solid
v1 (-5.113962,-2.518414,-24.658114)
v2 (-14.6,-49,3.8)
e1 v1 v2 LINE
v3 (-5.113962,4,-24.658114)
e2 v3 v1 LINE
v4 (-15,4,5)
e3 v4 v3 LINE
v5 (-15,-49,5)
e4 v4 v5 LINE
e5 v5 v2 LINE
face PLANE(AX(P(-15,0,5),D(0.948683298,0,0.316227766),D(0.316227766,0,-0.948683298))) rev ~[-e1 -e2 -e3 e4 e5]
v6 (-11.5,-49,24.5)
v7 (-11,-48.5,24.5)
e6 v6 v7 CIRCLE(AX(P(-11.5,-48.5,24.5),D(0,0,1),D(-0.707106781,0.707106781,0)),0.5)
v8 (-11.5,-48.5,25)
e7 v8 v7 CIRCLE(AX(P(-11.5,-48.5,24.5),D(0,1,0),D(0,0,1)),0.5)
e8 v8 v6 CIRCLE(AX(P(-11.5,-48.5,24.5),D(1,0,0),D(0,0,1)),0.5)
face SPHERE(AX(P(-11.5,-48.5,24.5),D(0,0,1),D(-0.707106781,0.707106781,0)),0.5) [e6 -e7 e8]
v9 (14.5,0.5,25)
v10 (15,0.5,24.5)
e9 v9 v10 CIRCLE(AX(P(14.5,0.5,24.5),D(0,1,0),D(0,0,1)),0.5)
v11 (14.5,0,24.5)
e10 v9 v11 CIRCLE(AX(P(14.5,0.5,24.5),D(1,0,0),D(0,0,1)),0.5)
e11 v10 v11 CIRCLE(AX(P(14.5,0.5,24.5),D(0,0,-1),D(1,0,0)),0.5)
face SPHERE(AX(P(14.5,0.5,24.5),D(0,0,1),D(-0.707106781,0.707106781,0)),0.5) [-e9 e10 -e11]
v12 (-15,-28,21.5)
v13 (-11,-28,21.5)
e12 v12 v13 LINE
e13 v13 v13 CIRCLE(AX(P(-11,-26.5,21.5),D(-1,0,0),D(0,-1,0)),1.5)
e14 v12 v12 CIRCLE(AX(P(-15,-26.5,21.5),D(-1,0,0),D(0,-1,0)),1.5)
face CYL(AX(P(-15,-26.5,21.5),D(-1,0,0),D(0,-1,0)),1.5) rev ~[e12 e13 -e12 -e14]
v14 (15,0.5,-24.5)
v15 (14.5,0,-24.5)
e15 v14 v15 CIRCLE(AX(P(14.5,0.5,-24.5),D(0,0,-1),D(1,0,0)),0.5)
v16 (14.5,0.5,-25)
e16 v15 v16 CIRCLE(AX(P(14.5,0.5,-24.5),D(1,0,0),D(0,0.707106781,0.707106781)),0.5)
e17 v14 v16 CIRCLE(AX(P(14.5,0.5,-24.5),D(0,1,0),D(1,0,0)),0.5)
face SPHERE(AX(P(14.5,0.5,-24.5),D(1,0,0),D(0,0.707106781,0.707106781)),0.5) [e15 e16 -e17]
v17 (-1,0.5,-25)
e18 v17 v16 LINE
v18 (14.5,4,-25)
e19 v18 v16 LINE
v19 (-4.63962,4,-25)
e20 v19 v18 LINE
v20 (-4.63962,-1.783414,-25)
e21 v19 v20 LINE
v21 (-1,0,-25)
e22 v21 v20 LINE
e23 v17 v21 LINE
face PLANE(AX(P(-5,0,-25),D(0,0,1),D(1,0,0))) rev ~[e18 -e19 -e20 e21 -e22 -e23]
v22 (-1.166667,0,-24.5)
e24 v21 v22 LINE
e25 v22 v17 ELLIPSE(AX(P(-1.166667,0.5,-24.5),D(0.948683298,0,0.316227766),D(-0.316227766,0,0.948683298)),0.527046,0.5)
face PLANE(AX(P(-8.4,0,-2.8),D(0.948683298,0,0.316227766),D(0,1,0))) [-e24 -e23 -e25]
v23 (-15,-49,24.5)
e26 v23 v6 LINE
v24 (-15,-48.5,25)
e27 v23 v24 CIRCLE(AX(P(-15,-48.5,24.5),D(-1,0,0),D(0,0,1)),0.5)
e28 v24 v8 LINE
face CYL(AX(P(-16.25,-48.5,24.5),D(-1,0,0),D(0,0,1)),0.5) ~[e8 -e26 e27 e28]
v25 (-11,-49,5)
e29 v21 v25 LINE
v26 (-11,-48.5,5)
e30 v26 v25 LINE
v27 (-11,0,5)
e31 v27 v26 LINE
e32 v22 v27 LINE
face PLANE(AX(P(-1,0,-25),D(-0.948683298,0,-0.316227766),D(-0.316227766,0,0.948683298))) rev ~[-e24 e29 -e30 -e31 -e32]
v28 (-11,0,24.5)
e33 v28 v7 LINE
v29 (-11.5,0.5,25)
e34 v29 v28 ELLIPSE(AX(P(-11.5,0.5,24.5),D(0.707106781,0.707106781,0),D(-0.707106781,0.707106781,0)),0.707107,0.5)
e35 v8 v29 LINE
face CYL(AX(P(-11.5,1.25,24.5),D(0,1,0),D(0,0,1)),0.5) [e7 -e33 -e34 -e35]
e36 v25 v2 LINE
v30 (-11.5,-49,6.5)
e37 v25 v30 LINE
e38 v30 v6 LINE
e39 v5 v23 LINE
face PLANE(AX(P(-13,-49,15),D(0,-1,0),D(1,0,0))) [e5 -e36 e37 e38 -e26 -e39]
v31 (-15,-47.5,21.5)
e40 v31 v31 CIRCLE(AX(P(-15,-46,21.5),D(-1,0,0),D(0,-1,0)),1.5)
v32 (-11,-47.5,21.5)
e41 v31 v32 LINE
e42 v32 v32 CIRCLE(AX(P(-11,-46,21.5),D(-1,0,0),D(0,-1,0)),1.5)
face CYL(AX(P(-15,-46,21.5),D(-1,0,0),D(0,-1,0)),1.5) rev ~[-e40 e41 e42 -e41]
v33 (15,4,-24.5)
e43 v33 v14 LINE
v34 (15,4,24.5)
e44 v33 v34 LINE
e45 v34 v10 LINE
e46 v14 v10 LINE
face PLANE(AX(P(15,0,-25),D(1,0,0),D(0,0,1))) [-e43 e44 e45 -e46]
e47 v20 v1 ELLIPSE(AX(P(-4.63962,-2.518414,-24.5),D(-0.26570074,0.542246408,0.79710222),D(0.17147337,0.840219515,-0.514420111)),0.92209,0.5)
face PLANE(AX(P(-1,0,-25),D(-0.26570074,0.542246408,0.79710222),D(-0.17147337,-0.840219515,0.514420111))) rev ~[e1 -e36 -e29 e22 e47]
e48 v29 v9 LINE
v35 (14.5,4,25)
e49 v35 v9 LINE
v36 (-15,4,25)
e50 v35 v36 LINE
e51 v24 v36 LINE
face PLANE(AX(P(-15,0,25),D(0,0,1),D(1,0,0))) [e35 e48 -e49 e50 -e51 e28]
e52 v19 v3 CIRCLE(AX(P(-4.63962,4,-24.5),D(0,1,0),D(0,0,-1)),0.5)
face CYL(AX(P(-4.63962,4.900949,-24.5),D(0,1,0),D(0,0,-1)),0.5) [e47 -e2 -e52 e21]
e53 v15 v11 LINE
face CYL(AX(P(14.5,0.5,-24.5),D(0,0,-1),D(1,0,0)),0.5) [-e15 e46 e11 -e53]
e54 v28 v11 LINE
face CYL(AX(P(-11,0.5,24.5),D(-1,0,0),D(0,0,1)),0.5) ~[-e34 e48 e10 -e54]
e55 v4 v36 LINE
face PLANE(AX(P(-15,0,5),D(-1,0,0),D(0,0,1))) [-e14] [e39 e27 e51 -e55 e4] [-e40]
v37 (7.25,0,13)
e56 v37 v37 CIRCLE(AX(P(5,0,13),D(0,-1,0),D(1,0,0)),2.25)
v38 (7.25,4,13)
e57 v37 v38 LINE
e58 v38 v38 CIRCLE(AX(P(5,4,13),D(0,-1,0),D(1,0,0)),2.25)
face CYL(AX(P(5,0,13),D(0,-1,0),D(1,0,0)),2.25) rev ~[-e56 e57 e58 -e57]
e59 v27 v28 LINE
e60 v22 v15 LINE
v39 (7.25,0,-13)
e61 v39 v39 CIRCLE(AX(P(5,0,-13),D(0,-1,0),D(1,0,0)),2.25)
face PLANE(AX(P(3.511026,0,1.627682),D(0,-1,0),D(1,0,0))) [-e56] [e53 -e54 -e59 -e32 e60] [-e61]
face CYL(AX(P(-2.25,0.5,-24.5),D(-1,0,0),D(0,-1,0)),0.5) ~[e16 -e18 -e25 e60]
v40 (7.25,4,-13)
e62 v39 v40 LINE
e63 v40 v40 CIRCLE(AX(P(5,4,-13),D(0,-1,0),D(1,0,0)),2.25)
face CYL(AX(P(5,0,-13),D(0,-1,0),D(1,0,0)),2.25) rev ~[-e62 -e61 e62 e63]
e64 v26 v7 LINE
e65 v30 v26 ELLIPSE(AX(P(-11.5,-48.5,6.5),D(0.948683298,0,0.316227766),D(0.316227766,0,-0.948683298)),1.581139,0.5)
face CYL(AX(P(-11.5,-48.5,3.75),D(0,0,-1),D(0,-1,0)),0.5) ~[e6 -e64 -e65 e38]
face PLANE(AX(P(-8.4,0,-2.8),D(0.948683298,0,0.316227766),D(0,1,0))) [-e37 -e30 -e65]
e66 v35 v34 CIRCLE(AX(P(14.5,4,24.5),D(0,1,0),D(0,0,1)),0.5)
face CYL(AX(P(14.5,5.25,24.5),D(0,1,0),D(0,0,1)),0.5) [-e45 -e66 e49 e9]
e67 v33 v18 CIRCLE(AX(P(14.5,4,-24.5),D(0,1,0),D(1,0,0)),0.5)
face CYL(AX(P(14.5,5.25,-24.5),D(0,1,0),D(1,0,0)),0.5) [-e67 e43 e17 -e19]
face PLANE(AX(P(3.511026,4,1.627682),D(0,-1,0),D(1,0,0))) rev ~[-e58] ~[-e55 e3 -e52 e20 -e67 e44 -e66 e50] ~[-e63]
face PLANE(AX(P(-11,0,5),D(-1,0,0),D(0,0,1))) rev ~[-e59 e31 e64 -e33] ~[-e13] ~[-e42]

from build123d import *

# Parameters (mm, degrees)
F0_R         = 2.25
F0_W         = 4
F0_H         = 20
F1_DEPTH     = 4
F2_W         = 4
F2_H         = 20
F3_DEPTH     = 49
F5_DEPTH     = 13.2825661727
F6_T1_DEPTH  = 4.75
F6_T3_DEPTH  = 48.5
F6_T5_DEPTH  = 25.5
F6_T7_DEPTH  = 49
F6_T9_DEPTH  = 4.75
F6_T11_DEPTH = 7.7618980501
F6_S15_W     = 0.51
F6_S15_H     = 0.51
F6_T16_DEPTH = 0.51
F6_S21_W     = 0.51
F6_S21_H     = 0.51
F6_T22_DEPTH = 0.51
F6_S27_W     = 0.51
F6_S27_H     = 0.51
F6_T28_DEPTH = 0.51
F6_T34_DEPTH = 16.75
F6_T39_DEPTH = 20.75
F6_T45_DEPTH = 49.75
F6_T49_DEPTH = 26.75
F7_R         = 1.5
F8_DEPTH     = 30.001


# Not quite as in the source:
# - a fillet or chamfer that OpenCascade refuses, or shapes differently, is made with other operations: its cross-section is extruded or revolved along the edge and cut away or added


with BuildPart() as f1:
    # F0 (on Front) → F1 (new body)
    with BuildSketch(Plane.XZ):
        Polygon((15, 25), (-11, 25), (-11, 5), (-1, -25), (15, -25), align=None)
        with Locations((5, -13)):
            Circle(F0_R, mode=Mode.SUBTRACT)
        with Locations((5, 13)):
            Circle(F0_R, mode=Mode.SUBTRACT)
        with Locations((-13, 15)):
            Rectangle(F0_W, F0_H)
        Polygon((-11, 5), (-15, 5), (-5, -25), (-1, -25), align=None)
    extrude(amount=-F1_DEPTH)

    # F2 (on face) → F3 (join)
    with BuildSketch(Plane.XZ):
        with Locations((-13, 15)):
            Rectangle(F2_W, F2_H)
        Polygon((-11, 5), (-15, 5), (-5, -25), (-1, -25), align=None)
    extrude(amount=F3_DEPTH)

    # F4 (on face) → F5 (cut, through all)
    with BuildSketch(Plane(origin=(-8.4, 0, -2.8), x_dir=(0, 1, 0), z_dir=(0.9486832981, 0, 0.316227766))):
        Polygon((0, -23.4008546852), (-49, 8.2219219164), (-49, -23.4008546852), align=None)
    extrude(amount=-F5_DEPTH, mode=Mode.SUBTRACT)

    # F6: fillet of radius 0.5 on 9 edges, made by hand

    # F6_s2 → F6_t1 (cut)
    with BuildSketch(Plane.YZ.offset(-16.25)):
        with BuildLine():
            ThreePointArc((-48.5, 25), (-48.8535533906, 24.8535533906), (-49, 24.5))
            Line((-49, 24.5), (-49, 25))
            Line((-49, 25), (-48.5, 25))
        make_face()
    extrude(amount=F6_T1_DEPTH, mode=Mode.SUBTRACT)

    # F6_s4 → F6_t3 (cut)
    with BuildSketch(Plane.XZ):
        with BuildLine():
            ThreePointArc((-11.5, 25), (-11.1464466094, 24.8535533906), (-11, 24.5))
            Line((-11, 24.5), (-11, 25))
            Line((-11, 25), (-11.5, 25))
        make_face()
    extrude(amount=F6_T3_DEPTH, mode=Mode.SUBTRACT)

    # F6_s6 → F6_t5 (cut)
    with BuildSketch(Plane.YZ.offset(-11)):
        with BuildLine():
            ThreePointArc((0.5, 25), (0.1464466094, 24.8535533906), (0, 24.5))
            Line((0, 24.5), (0, 25))
            Line((0, 25), (0.5, 25))
        make_face()
    extrude(amount=F6_T5_DEPTH, mode=Mode.SUBTRACT)

    # F6_s8 → F6_t7 (cut)
    with BuildSketch(Plane.XY.offset(-24.5)):
        with BuildLine():
            ThreePointArc((15, 0.5), (14.8535533906, 0.1464466094), (14.5, 0))
            Line((14.5, 0), (15, 0))
            Line((15, 0), (15, 0.5))
        make_face()
    extrude(amount=F6_T7_DEPTH, mode=Mode.SUBTRACT)

    # F6_s10 → F6_t9 (cut)
    with BuildSketch(Plane.XZ.offset(-5.25)):
        with BuildLine():
            ThreePointArc((14.5, 25), (14.8535533906, 24.8535533906), (15, 24.5))
            Line((15, 24.5), (15, 25))
            Line((15, 25), (14.5, 25))
        make_face()
        with BuildLine():
            ThreePointArc((15, -24.5), (14.8535533906, -24.8535533906), (14.5, -25))
            Line((14.5, -25), (15, -25))
            Line((15, -25), (15, -24.5))
        make_face()
    extrude(amount=F6_T9_DEPTH, mode=Mode.SUBTRACT)

    # F6_s12 → F6_t11 (cut)
    with BuildSketch(Plane.XZ.offset(-4.9009490251)):
        with BuildLine():
            ThreePointArc((-4.63962039, -25), (-4.9319755323, -24.9056210926), (-5.113962039, -24.658113883))
            Line((-5.113962039, -24.658113883), (-5, -25))
            Line((-5, -25), (-4.63962039, -25))
        make_face()
    extrude(amount=F6_T11_DEPTH, mode=Mode.SUBTRACT)


with BuildPart() as f6_tool14:
    # F6_s15 → F6_t16 (new body)
    with BuildSketch(Plane.XY.offset(24.5)):
        with Locations((-11.245, -48.755)):
            Rectangle(F6_S15_W, F6_S15_H)
    extrude(amount=F6_T16_DEPTH)

    # F6_s17 → F6_t18 (revolve, cut)
    with BuildSketch(Plane(origin=(-11.5, -48.5, 24.5), x_dir=(-0.7071067812, 0.7071067812, 0), z_dir=(0.7071067812, 0.7071067812, 0))):
        with BuildLine():
            ThreePointArc((0, -0.5), (0.5, 0), (0, 0.5))
            Line((0, 0.5), (0, -0.5))
        make_face()
    revolve(axis=Axis((-11.5, -48.5, 24.5), (0, 0, 1)), mode=Mode.SUBTRACT)


with BuildPart() as f1_1:
    add(f1.part)

    # F6_t13: cut F6_tool14
    add(f6_tool14.part, mode=Mode.SUBTRACT)


with BuildPart() as f6_tool20:
    # F6_s21 → F6_t22 (new body)
    with BuildSketch(Plane.XY.offset(24.5)):
        with Locations((14.755, 0.245)):
            Rectangle(F6_S21_W, F6_S21_H)
    extrude(amount=F6_T22_DEPTH)

    # F6_s23 → F6_t24 (revolve, cut)
    with BuildSketch(Plane(origin=(14.5, 0.5, 24.5), x_dir=(-0.7071067812, 0.7071067812, 0), z_dir=(0.7071067812, 0.7071067812, 0))):
        with BuildLine():
            ThreePointArc((0, -0.5), (0.5, 0), (0, 0.5))
            Line((0, 0.5), (0, -0.5))
        make_face()
    revolve(axis=Axis((14.5, 0.5, 24.5), (0, 0, 1)), mode=Mode.SUBTRACT)


with BuildPart() as f1_2:
    add(f1_1.part)

    # F6_t19: cut F6_tool20
    add(f6_tool20.part, mode=Mode.SUBTRACT)


with BuildPart() as f6_tool26:
    # F6_s27 → F6_t28 (new body)
    with BuildSketch(Plane.YZ.offset(14.5)):
        with Locations((0.245, -24.755)):
            Rectangle(F6_S27_W, F6_S27_H)
    extrude(amount=F6_T28_DEPTH)

    # F6_s29 → F6_t30 (revolve, cut)
    with BuildSketch(Plane(origin=(14.5, 0.5, -24.5), x_dir=(0, 0.7071067812, 0.7071067812), z_dir=(0, 0.7071067812, -0.7071067812))):
        with BuildLine():
            ThreePointArc((0, -0.5), (0.5, 0), (0, 0.5))
            Line((0, 0.5), (0, -0.5))
        make_face()
    revolve(axis=Axis((14.5, 0.5, -24.5), (1, 0, 0)), mode=Mode.SUBTRACT)


with BuildPart() as f1_3:
    add(f1_2.part)

    # F6_t25: cut F6_tool26
    add(f6_tool26.part, mode=Mode.SUBTRACT)


with BuildPart() as f6_tool32:
    # F6_s33 → F6_t34 (new body)
    with BuildSketch(Plane.YZ.offset(-2.25)):
        with BuildLine():
            ThreePointArc((0, -24.5), (0.1464466094, -24.8535533906), (0.5, -25))
            Line((0.5, -25), (0, -25))
            Line((0, -25), (0, -24.5))
        make_face()
    extrude(amount=F6_T34_DEPTH)

    split(bisect_by=Plane(origin=(-8.4, 0, -2.8), x_dir=(0, 1, 0), z_dir=(0.9486832981, 0, 0.316227766)), keep=Keep.TOP)


with BuildPart() as f1_4:
    add(f1_3.part)

    # F6_t31: cut F6_tool32
    add(f6_tool32.part, mode=Mode.SUBTRACT)


with BuildPart() as f6_tool37:
    # F6_s38 → F6_t39 (new body)
    with BuildSketch(Plane.XY.offset(3.75)):
        with BuildLine():
            ThreePointArc((-11.5, -49), (-11.1464466094, -48.8535533906), (-11, -48.5))
            Line((-11, -48.5), (-11, -49))
            Line((-11, -49), (-11.5, -49))
        make_face()
    extrude(amount=F6_T39_DEPTH)

    split(bisect_by=Plane(origin=(-8.4, 0, -2.8), x_dir=(0, 1, 0), z_dir=(0.9486832981, 0, 0.316227766)), keep=Keep.TOP)


with BuildPart() as f1_5:
    add(f1_4.part)

    # F6_t36: cut F6_tool37
    add(f6_tool37.part, mode=Mode.SUBTRACT)


with BuildPart() as f6_tool43:
    # F6_s44 → F6_t45 (new body)
    with BuildSketch(Plane.XZ.offset(-1.25)):
        with BuildLine():
            ThreePointArc((-11.5, 25), (-11.1464466094, 24.8535533906), (-11, 24.5))
            Line((-11, 24.5), (-11, 25))
            Line((-11, 25), (-11.5, 25))
        make_face()
    extrude(amount=F6_T45_DEPTH)

    split(bisect_by=Plane.XZ, keep=Keep.BOTTOM)


with BuildPart() as f6_tool47:
    # F6_s48 → F6_t49 (new body)
    with BuildSketch(Plane.YZ.offset(14.5)):
        with BuildLine():
            ThreePointArc((0.5, 25), (0.1464466094, 24.8535533906), (0, 24.5))
            Line((0, 24.5), (0, 25))
            Line((0, 25), (0.5, 25))
        make_face()
    extrude(amount=-F6_T49_DEPTH)

    split(bisect_by=Plane.YZ.offset(-11), keep=Keep.BOTTOM)


with BuildPart() as f6_tool43_1:
    add(f6_tool43.part)

    # F6_t51: intersect F6_tool47
    add(f6_tool47.part, mode=Mode.INTERSECT)


with BuildPart() as f1_6:
    add(f1_5.part)

    # F6_t41: cut F6_tool43
    add(f6_tool43_1.part, mode=Mode.SUBTRACT)

    # F7 (on face) → F8 (cut, through all)
    with BuildSketch(Plane(origin=(-15, 0, 0), x_dir=(0, -1, 0), z_dir=(-1, 0, 0))):
        with Locations((26.5, 21.5)):
            Circle(F7_R)
        with Locations((46, 21.5)):
            Circle(F7_R)
    extrude(amount=-F8_DEPTH, mode=Mode.SUBTRACT)


solid = f1_6.part
